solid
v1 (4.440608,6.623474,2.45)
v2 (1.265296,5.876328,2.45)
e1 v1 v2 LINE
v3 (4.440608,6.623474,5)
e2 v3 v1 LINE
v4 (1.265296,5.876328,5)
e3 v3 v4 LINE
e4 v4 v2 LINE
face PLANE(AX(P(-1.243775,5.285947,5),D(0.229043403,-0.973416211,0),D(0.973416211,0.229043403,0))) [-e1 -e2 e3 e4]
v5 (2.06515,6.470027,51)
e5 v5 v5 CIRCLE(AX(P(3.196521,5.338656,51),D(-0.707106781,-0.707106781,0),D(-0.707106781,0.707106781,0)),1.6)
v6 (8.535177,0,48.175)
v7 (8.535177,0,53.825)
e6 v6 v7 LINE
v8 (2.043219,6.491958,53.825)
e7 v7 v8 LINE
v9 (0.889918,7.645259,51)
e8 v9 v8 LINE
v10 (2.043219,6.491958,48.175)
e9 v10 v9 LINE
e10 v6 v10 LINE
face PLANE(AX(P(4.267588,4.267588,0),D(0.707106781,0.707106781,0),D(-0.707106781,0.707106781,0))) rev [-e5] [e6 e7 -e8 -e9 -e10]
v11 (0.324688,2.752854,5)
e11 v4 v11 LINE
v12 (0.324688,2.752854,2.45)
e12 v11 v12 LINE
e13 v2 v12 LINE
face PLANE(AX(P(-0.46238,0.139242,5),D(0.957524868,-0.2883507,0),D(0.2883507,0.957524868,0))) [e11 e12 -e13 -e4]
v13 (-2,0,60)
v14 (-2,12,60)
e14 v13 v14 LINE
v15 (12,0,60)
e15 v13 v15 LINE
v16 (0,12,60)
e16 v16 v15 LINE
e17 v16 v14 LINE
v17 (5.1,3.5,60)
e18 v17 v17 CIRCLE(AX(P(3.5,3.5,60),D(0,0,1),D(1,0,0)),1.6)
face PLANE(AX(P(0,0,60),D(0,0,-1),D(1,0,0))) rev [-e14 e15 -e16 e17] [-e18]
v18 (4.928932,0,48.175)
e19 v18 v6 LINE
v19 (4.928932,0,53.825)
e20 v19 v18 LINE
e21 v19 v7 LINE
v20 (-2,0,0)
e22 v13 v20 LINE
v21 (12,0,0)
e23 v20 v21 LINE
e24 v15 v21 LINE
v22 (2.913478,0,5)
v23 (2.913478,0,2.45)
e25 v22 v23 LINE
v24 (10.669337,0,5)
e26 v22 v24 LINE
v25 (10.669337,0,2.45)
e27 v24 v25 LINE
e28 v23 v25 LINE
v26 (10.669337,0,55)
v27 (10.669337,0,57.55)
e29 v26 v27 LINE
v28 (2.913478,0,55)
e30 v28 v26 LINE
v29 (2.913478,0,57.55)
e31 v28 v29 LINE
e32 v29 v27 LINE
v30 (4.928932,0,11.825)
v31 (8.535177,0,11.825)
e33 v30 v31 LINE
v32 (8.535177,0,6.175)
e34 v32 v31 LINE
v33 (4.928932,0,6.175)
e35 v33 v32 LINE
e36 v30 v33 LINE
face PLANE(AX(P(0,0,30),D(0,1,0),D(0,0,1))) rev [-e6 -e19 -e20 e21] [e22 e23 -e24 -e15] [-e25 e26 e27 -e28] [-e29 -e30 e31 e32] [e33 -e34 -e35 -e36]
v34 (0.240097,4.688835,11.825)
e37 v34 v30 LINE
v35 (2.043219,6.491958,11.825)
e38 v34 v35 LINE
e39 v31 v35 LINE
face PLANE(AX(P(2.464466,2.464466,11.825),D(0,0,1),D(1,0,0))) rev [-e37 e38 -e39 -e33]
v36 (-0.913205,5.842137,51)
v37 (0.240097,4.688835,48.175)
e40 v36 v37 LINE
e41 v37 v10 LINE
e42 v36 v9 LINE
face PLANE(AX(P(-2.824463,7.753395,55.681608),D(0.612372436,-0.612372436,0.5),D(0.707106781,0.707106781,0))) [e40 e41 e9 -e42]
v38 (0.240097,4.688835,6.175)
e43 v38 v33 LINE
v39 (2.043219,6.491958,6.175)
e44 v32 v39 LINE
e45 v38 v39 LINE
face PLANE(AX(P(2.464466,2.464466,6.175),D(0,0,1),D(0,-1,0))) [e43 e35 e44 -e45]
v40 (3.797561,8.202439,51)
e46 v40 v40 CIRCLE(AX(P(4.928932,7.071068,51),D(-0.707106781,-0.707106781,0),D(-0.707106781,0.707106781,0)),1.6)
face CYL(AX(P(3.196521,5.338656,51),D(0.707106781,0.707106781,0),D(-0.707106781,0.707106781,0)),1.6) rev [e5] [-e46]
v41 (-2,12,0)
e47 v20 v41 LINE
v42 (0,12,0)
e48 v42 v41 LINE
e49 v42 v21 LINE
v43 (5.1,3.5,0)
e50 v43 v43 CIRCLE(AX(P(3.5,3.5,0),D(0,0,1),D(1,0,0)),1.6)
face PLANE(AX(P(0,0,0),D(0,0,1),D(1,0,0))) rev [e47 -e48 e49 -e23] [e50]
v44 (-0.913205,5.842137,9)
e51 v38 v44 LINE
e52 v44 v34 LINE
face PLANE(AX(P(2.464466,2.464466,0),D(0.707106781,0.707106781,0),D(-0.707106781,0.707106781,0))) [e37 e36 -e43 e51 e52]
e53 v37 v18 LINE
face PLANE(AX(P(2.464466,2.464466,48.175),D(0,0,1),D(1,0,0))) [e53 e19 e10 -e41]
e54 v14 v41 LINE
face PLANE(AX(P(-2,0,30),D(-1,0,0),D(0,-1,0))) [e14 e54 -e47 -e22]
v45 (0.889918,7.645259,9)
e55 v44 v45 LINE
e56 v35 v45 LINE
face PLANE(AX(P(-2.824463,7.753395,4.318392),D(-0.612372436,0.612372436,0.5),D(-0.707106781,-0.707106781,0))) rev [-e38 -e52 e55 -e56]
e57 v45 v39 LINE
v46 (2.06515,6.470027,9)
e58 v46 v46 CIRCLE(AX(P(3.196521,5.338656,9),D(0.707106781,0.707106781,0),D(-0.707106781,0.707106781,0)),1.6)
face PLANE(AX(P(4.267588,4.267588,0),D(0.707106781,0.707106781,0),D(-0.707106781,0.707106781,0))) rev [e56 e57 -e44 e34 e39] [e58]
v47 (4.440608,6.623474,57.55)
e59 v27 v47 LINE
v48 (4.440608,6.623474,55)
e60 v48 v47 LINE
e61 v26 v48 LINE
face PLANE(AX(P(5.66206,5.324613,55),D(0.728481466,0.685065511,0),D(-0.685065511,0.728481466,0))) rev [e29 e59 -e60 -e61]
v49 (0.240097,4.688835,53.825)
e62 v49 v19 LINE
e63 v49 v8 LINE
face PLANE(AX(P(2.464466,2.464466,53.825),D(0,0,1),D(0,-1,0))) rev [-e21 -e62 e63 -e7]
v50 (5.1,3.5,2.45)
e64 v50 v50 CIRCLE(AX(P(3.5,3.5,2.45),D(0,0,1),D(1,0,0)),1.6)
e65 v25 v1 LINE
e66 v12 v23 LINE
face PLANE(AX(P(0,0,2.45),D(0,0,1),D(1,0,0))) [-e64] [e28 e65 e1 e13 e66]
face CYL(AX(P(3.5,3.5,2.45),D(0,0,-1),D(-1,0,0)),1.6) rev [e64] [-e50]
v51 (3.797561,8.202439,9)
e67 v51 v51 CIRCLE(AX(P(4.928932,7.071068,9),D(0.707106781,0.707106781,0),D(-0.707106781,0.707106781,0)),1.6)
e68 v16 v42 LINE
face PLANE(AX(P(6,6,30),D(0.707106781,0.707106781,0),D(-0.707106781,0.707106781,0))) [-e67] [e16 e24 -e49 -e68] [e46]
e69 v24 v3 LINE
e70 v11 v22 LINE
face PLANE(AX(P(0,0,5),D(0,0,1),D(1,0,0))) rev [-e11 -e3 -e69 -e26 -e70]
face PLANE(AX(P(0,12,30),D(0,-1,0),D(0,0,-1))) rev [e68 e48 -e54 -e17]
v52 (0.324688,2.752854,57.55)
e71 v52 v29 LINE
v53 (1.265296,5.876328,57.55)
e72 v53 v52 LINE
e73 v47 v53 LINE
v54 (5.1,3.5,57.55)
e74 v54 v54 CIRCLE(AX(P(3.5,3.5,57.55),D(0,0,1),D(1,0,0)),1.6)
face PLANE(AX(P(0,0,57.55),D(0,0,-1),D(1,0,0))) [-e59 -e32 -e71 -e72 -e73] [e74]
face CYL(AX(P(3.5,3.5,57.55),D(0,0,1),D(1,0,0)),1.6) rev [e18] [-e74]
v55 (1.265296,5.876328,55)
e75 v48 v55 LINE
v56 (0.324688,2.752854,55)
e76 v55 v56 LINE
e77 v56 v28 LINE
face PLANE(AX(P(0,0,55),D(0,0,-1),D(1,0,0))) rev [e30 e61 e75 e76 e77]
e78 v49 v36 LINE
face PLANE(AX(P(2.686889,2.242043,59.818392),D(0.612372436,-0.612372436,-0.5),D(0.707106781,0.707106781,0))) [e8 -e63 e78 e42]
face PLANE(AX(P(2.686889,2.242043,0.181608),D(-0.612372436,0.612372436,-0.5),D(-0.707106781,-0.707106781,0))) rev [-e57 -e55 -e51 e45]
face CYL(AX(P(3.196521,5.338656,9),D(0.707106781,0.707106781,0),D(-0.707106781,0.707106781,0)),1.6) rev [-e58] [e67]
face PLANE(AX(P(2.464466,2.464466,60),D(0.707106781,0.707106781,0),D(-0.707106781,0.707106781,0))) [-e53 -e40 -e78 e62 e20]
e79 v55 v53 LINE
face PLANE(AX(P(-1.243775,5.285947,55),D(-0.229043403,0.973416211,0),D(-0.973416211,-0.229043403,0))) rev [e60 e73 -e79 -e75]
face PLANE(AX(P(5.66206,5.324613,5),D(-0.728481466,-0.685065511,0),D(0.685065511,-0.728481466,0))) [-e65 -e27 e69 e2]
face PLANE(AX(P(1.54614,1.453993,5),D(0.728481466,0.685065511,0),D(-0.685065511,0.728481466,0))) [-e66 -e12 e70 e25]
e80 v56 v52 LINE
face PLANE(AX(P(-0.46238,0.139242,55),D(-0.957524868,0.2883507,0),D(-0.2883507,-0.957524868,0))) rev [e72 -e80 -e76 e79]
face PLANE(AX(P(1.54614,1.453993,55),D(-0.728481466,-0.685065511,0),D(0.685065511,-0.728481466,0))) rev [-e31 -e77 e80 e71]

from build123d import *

# Parameters (mm, degrees)
BOSS_EXTRUDE1_DEPTH     = 30
SKETCH1_13_W            = 2
SKETCH1_13_H            = 12
BOSS_EXTRUDE6_DEPTH     = 30
CUT_EXTRUDE3_DEPTH      = 5
BOSS_EXTRUDE4_START     = -2.45
BOSS_EXTRUDE4_OUTLINE_W = 30
BOSS_EXTRUDE4_OUTLINE_H = 14.485281374
BOSS_EXTRUDE4_OUTLINE_R = 1.6
BOSS_EXTRUDE4_DEPTH     = 2.45
CUT_EXTRUDE1_DEPTH      = 5
SKETCH1_10_R            = 1.6
BOSS_EXTRUDE5_DEPTH     = 2.45
CUT_EXTRUDE4_DEPTH      = 63.353829072


# Read off the part's stored shape, not the designer's step: Boss-Extrude4
with BuildPart() as part:
    # Sketch1 → Boss-Extrude1 (new body)
    with BuildSketch(Plane.XY):
        Polygon((0, 12), (12, 0), (0, 0), align=None)
    boss_extrude1 = extrude(amount=BOSS_EXTRUDE1_DEPTH)

    # Sketch1<13> → Boss-Extrude6 (add)
    with BuildSketch(Plane.XY):
        with Locations((-1, 6)):
            Rectangle(SKETCH1_13_W, SKETCH1_13_H)
    boss_extrude6 = extrude(amount=BOSS_EXTRUDE6_DEPTH)

    # Sketch4 → Cut-Extrude3 (cut)
    with BuildSketch(Plane(origin=(6, 6, 0), x_dir=(0, 0, -1), z_dir=(0.7071067811865477, 0.7071067811865475, 0))):
        Polygon((-6.175, -8.485281374), (-6.175, 3.145733136), (-9, 4.776747647), (-11.825, 3.145733136), (-11.825, -8.485281374), align=None)
    cut_extrude3 = extrude(amount=-CUT_EXTRUDE3_DEPTH, mode=Mode.SUBTRACT)

    # Boss-Extrude4 outline → Boss-Extrude4 (add)
    with BuildSketch(Plane(origin=(6, 6, 0), x_dir=(0, 0, -1), z_dir=(0.7071067811865477, 0.7071067811865475, 0)).offset(BOSS_EXTRUDE4_START)):
        with Locations((-15, -1.242640687)):
            Rectangle(BOSS_EXTRUDE4_OUTLINE_W, BOSS_EXTRUDE4_OUTLINE_H)
        with Locations((-9, 1.514718626)):
            Circle(BOSS_EXTRUDE4_OUTLINE_R, mode=Mode.SUBTRACT)
    boss_extrude4 = extrude(amount=BOSS_EXTRUDE4_DEPTH)

    # Sketch1<4> → Cut-Extrude1 (cut)
    with BuildSketch(Plane.XY):
        Polygon((10.669337222, 0), (4.440608352, 6.623473909), (1.265296423, 5.876327682), (0.324688071, 2.752853773), (2.91347758, 0), align=None)
    cut_extrude1 = extrude(amount=CUT_EXTRUDE1_DEPTH, mode=Mode.SUBTRACT)

    # Sketch1<10> → Boss-Extrude5 (add)
    # profile 1 of 2: a face of its own
    with BuildSketch(Plane.XY):
        Polygon((2.559391648, 0.376526091), (5.734703577, 1.123672318), (6.675311929, 4.247146227), (4.440608352, 6.623473909), (1.265296423, 5.876327682), (0.324688071, 2.752853773), align=None)
        with Locations((3.5, 3.5)):
            Circle(SKETCH1_10_R, mode=Mode.SUBTRACT)
    # profile 2 of 2: a face of its own
    with BuildSketch(Plane.XY):
        Polygon((3.5, 0), (10.669337222, 0), (6.675311929, 4.247146227), (5.734703577, 1.123672318), (2.559391648, 0.376526091), (2.91347758, 0), align=None)
    boss_extrude5 = extrude(amount=BOSS_EXTRUDE5_DEPTH)

    # Mirror1: Boss-Extrude1, Boss-Extrude6, Cut-Extrude3, Boss-Extrude4, Cut-Extrude1, Boss-Extrude5 across plane
    add(boss_extrude1.mirror(Plane.XY.offset(30)))
    add(boss_extrude6.mirror(Plane.XY.offset(30)))
    add(cut_extrude3.mirror(Plane.XY.offset(30)), mode=Mode.SUBTRACT)
    add(boss_extrude4.mirror(Plane.XY.offset(30)))
    add(cut_extrude1.mirror(Plane.XY.offset(30)), mode=Mode.SUBTRACT)
    add(boss_extrude5.mirror(Plane.XY.offset(30)))

    # Sketch1<12> → Cut-Extrude4 (cut, through all)
    with BuildSketch(Plane.XY):
        Polygon((12, -3.5), (12, 0), (10.669337222, 0), (3.5, 0), (2.91347758, 0), (1.441458618, 0), (0, 0), (0, -3.5), align=None)
    extrude(amount=CUT_EXTRUDE4_DEPTH, mode=Mode.SUBTRACT)


solid = part.part
